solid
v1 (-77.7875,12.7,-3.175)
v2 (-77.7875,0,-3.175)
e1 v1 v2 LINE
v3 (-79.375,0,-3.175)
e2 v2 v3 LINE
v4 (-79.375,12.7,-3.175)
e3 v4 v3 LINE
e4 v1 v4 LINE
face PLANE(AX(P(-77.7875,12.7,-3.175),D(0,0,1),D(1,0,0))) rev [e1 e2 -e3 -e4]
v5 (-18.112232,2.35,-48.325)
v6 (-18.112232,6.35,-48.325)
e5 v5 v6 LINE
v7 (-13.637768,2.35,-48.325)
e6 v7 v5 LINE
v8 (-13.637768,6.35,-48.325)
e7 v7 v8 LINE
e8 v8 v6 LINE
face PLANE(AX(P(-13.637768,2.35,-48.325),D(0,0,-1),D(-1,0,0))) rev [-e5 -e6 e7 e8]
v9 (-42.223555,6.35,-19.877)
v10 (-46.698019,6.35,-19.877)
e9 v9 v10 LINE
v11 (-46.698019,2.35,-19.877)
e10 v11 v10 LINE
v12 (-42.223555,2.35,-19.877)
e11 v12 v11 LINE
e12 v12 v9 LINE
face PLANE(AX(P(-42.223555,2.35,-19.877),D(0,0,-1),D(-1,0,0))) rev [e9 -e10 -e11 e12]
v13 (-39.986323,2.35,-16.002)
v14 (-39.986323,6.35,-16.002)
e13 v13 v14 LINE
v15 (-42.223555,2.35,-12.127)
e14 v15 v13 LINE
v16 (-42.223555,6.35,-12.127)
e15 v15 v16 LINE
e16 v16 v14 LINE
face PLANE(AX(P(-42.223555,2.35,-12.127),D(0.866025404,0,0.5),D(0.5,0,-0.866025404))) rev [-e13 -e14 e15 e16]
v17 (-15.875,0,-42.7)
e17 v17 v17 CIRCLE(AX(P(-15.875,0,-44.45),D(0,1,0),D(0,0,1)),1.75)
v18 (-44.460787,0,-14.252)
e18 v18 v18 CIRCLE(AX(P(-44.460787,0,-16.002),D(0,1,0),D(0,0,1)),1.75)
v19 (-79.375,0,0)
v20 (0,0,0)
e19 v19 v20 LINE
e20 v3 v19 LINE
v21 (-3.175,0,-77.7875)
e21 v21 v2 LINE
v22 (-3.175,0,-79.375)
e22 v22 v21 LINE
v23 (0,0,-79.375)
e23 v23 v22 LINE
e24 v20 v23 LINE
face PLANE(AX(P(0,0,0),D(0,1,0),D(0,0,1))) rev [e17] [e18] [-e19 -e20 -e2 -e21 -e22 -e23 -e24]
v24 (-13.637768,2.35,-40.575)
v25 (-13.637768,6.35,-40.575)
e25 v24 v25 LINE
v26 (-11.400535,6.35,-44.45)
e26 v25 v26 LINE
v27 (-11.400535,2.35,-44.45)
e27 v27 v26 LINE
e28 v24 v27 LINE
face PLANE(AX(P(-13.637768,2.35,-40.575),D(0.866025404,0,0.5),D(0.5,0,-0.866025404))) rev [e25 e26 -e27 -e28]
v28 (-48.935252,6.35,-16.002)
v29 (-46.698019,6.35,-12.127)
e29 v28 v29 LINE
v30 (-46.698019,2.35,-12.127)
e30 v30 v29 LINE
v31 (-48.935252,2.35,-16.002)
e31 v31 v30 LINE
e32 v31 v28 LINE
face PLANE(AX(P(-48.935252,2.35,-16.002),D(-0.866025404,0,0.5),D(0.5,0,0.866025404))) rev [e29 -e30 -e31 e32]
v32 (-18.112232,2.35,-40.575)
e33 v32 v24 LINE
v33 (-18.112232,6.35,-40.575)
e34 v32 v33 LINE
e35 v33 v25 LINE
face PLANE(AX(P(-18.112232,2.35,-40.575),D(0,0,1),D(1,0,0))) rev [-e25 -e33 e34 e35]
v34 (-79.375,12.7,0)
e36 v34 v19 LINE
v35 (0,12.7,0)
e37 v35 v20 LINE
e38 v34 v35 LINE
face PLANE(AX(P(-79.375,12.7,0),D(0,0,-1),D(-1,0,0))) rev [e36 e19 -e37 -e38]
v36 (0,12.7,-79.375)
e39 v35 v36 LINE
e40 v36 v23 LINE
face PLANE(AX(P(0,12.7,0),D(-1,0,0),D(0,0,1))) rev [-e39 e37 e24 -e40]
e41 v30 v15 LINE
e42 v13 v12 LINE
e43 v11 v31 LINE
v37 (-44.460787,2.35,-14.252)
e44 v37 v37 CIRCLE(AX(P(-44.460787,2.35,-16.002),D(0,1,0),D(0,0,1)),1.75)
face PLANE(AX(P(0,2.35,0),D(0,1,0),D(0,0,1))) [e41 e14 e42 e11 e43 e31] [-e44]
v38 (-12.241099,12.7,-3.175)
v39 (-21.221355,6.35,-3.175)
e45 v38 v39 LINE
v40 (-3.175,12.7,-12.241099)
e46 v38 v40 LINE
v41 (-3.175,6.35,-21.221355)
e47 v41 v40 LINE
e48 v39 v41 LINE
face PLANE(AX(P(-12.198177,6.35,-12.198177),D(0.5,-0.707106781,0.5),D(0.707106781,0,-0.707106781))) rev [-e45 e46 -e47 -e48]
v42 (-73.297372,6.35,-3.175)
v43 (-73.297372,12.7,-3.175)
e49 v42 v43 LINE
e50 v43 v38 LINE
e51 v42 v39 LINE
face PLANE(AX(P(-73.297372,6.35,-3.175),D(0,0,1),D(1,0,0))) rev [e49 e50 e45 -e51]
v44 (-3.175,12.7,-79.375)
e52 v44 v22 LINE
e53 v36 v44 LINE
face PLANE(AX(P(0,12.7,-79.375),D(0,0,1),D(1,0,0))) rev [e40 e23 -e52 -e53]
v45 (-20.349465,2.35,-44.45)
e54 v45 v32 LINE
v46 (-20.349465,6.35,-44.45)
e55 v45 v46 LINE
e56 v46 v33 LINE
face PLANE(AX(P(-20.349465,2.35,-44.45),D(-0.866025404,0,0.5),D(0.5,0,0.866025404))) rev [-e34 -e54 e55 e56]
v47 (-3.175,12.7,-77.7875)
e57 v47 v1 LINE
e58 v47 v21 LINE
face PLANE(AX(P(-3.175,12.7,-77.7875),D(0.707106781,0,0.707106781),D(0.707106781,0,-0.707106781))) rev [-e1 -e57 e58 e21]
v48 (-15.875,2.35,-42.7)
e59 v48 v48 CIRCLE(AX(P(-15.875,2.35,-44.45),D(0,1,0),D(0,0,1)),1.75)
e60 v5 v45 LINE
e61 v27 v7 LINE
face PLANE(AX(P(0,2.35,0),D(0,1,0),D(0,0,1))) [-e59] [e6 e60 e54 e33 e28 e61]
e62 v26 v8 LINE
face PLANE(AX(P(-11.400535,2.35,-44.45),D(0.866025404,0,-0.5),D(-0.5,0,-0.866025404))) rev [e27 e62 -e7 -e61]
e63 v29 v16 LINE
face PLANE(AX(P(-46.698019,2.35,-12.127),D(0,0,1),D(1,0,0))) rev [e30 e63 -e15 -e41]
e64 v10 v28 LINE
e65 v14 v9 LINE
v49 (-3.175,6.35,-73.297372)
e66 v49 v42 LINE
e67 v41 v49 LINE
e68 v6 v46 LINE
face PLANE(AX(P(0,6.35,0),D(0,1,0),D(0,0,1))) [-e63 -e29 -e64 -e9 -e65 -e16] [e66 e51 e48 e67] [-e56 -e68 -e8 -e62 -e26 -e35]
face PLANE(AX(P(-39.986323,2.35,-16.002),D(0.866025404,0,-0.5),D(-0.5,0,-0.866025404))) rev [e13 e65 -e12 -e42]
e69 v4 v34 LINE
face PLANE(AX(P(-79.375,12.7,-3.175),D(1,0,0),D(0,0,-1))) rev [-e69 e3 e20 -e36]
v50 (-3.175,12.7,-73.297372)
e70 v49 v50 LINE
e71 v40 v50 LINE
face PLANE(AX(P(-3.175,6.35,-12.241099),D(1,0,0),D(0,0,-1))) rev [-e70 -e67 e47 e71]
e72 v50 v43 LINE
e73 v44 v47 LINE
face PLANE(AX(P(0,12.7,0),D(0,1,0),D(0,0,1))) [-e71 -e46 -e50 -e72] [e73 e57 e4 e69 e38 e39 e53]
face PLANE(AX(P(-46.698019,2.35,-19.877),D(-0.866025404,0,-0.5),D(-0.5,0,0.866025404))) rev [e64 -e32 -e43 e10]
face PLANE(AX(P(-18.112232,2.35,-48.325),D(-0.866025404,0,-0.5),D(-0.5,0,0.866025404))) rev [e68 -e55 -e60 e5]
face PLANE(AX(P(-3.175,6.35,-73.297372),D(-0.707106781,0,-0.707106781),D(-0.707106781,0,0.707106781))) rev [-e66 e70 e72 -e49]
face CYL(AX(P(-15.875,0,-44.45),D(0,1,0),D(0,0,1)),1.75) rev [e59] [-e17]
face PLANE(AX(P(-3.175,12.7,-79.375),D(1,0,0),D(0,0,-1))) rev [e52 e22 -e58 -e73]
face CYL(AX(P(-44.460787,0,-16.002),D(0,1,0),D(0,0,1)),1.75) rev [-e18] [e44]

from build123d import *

# Parameters (mm, degrees)
BOSS_EXTRUDE1_DEPTH = 12.7
CUT_EXTRUDE1_DEPTH  = 6.35
CHAMFER1_SIZE       = 6.35
SKETCH3_R           = 1.75
CUT_EXTRUDE2_DEPTH  = 6.35
SKETCH4_R           = 1.75
CUT_EXTRUDE3_DEPTH  = 4


with BuildPart() as part:
    # Sketch1 → Boss-Extrude1 (new body)
    with BuildSketch(Plane(origin=(0, 0, 0), x_dir=(1, 0, 0), z_dir=(0, 1, 0))):
        Polygon((-79.375, 0), (0, 0), (0, 79.375), (-3.175, 79.375), (-3.175, 77.7875), (-77.7875, 3.175), (-79.375, 3.175), align=None)
    extrude(amount=BOSS_EXTRUDE1_DEPTH)

    # Sketch2 → Cut-Extrude1 (cut)
    with BuildSketch(Plane(origin=(0, 12.7, 0), x_dir=(1, 0, 0), z_dir=(0, 1, 0))):
        Polygon((-73.297371939, 3.175), (-12.241098836, 3.175), (-3.175, 12.241098836), (-3.175, 73.297371939), align=None)
    extrude(amount=-CUT_EXTRUDE1_DEPTH, mode=Mode.SUBTRACT)

    # Chamfer1
    chamfer1_edges = [part.edges().sort_by_distance(p)[0] for p in [
        (-7.708049418, 6.35, -7.708049418),
    ]]
    chamfer(chamfer1_edges, length=CHAMFER1_SIZE - 0.0001)  # a hair under: the kernel refuses the full size

    # Sketch3 → Cut-Extrude2 (cut)
    with BuildSketch(Plane(origin=(0, 6.35, 0), x_dir=(1, 0, 0), z_dir=(0, 1, 0))):
        with Locations(Location((-44.460787159, 16.002, 0), (0, 0, 270))):
            Circle(SKETCH3_R)
        with Locations(Location((-15.875, 44.45, 0), (0, 0, 270))):
            Circle(SKETCH3_R)
    extrude(amount=-CUT_EXTRUDE2_DEPTH, mode=Mode.SUBTRACT)

    # Sketch4 → Cut-Extrude3 (cut)
    # profile 1 of 2: a face of its own
    with BuildSketch(Plane(origin=(0, 6.35, 0), x_dir=(1, 0, 0), z_dir=(0, 1, 0))):
        Polygon((-13.637767707, 40.575), (-11.400535414, 44.45), (-13.637767707, 48.325), (-18.112232293, 48.325), (-20.349464586, 44.45), (-18.112232293, 40.575), align=None)
        with Locations(Location((-15.875, 44.45, 0), (0, 0, 270))):
            Circle(SKETCH4_R, mode=Mode.SUBTRACT)
    # profile 2 of 2: a face of its own
    with BuildSketch(Plane(origin=(0, 6.35, 0), x_dir=(1, 0, 0), z_dir=(0, 1, 0))):
        Polygon((-39.986322573, 16.002), (-42.223554866, 19.877), (-46.698019452, 19.877), (-48.935251745, 16.002), (-46.698019452, 12.127), (-42.223554866, 12.127), align=None)
        with Locations(Location((-44.460787159, 16.002, 0), (0, 0, 270))):
            Circle(SKETCH4_R, mode=Mode.SUBTRACT)
    extrude(amount=-CUT_EXTRUDE3_DEPTH, mode=Mode.SUBTRACT)


solid = part.part
